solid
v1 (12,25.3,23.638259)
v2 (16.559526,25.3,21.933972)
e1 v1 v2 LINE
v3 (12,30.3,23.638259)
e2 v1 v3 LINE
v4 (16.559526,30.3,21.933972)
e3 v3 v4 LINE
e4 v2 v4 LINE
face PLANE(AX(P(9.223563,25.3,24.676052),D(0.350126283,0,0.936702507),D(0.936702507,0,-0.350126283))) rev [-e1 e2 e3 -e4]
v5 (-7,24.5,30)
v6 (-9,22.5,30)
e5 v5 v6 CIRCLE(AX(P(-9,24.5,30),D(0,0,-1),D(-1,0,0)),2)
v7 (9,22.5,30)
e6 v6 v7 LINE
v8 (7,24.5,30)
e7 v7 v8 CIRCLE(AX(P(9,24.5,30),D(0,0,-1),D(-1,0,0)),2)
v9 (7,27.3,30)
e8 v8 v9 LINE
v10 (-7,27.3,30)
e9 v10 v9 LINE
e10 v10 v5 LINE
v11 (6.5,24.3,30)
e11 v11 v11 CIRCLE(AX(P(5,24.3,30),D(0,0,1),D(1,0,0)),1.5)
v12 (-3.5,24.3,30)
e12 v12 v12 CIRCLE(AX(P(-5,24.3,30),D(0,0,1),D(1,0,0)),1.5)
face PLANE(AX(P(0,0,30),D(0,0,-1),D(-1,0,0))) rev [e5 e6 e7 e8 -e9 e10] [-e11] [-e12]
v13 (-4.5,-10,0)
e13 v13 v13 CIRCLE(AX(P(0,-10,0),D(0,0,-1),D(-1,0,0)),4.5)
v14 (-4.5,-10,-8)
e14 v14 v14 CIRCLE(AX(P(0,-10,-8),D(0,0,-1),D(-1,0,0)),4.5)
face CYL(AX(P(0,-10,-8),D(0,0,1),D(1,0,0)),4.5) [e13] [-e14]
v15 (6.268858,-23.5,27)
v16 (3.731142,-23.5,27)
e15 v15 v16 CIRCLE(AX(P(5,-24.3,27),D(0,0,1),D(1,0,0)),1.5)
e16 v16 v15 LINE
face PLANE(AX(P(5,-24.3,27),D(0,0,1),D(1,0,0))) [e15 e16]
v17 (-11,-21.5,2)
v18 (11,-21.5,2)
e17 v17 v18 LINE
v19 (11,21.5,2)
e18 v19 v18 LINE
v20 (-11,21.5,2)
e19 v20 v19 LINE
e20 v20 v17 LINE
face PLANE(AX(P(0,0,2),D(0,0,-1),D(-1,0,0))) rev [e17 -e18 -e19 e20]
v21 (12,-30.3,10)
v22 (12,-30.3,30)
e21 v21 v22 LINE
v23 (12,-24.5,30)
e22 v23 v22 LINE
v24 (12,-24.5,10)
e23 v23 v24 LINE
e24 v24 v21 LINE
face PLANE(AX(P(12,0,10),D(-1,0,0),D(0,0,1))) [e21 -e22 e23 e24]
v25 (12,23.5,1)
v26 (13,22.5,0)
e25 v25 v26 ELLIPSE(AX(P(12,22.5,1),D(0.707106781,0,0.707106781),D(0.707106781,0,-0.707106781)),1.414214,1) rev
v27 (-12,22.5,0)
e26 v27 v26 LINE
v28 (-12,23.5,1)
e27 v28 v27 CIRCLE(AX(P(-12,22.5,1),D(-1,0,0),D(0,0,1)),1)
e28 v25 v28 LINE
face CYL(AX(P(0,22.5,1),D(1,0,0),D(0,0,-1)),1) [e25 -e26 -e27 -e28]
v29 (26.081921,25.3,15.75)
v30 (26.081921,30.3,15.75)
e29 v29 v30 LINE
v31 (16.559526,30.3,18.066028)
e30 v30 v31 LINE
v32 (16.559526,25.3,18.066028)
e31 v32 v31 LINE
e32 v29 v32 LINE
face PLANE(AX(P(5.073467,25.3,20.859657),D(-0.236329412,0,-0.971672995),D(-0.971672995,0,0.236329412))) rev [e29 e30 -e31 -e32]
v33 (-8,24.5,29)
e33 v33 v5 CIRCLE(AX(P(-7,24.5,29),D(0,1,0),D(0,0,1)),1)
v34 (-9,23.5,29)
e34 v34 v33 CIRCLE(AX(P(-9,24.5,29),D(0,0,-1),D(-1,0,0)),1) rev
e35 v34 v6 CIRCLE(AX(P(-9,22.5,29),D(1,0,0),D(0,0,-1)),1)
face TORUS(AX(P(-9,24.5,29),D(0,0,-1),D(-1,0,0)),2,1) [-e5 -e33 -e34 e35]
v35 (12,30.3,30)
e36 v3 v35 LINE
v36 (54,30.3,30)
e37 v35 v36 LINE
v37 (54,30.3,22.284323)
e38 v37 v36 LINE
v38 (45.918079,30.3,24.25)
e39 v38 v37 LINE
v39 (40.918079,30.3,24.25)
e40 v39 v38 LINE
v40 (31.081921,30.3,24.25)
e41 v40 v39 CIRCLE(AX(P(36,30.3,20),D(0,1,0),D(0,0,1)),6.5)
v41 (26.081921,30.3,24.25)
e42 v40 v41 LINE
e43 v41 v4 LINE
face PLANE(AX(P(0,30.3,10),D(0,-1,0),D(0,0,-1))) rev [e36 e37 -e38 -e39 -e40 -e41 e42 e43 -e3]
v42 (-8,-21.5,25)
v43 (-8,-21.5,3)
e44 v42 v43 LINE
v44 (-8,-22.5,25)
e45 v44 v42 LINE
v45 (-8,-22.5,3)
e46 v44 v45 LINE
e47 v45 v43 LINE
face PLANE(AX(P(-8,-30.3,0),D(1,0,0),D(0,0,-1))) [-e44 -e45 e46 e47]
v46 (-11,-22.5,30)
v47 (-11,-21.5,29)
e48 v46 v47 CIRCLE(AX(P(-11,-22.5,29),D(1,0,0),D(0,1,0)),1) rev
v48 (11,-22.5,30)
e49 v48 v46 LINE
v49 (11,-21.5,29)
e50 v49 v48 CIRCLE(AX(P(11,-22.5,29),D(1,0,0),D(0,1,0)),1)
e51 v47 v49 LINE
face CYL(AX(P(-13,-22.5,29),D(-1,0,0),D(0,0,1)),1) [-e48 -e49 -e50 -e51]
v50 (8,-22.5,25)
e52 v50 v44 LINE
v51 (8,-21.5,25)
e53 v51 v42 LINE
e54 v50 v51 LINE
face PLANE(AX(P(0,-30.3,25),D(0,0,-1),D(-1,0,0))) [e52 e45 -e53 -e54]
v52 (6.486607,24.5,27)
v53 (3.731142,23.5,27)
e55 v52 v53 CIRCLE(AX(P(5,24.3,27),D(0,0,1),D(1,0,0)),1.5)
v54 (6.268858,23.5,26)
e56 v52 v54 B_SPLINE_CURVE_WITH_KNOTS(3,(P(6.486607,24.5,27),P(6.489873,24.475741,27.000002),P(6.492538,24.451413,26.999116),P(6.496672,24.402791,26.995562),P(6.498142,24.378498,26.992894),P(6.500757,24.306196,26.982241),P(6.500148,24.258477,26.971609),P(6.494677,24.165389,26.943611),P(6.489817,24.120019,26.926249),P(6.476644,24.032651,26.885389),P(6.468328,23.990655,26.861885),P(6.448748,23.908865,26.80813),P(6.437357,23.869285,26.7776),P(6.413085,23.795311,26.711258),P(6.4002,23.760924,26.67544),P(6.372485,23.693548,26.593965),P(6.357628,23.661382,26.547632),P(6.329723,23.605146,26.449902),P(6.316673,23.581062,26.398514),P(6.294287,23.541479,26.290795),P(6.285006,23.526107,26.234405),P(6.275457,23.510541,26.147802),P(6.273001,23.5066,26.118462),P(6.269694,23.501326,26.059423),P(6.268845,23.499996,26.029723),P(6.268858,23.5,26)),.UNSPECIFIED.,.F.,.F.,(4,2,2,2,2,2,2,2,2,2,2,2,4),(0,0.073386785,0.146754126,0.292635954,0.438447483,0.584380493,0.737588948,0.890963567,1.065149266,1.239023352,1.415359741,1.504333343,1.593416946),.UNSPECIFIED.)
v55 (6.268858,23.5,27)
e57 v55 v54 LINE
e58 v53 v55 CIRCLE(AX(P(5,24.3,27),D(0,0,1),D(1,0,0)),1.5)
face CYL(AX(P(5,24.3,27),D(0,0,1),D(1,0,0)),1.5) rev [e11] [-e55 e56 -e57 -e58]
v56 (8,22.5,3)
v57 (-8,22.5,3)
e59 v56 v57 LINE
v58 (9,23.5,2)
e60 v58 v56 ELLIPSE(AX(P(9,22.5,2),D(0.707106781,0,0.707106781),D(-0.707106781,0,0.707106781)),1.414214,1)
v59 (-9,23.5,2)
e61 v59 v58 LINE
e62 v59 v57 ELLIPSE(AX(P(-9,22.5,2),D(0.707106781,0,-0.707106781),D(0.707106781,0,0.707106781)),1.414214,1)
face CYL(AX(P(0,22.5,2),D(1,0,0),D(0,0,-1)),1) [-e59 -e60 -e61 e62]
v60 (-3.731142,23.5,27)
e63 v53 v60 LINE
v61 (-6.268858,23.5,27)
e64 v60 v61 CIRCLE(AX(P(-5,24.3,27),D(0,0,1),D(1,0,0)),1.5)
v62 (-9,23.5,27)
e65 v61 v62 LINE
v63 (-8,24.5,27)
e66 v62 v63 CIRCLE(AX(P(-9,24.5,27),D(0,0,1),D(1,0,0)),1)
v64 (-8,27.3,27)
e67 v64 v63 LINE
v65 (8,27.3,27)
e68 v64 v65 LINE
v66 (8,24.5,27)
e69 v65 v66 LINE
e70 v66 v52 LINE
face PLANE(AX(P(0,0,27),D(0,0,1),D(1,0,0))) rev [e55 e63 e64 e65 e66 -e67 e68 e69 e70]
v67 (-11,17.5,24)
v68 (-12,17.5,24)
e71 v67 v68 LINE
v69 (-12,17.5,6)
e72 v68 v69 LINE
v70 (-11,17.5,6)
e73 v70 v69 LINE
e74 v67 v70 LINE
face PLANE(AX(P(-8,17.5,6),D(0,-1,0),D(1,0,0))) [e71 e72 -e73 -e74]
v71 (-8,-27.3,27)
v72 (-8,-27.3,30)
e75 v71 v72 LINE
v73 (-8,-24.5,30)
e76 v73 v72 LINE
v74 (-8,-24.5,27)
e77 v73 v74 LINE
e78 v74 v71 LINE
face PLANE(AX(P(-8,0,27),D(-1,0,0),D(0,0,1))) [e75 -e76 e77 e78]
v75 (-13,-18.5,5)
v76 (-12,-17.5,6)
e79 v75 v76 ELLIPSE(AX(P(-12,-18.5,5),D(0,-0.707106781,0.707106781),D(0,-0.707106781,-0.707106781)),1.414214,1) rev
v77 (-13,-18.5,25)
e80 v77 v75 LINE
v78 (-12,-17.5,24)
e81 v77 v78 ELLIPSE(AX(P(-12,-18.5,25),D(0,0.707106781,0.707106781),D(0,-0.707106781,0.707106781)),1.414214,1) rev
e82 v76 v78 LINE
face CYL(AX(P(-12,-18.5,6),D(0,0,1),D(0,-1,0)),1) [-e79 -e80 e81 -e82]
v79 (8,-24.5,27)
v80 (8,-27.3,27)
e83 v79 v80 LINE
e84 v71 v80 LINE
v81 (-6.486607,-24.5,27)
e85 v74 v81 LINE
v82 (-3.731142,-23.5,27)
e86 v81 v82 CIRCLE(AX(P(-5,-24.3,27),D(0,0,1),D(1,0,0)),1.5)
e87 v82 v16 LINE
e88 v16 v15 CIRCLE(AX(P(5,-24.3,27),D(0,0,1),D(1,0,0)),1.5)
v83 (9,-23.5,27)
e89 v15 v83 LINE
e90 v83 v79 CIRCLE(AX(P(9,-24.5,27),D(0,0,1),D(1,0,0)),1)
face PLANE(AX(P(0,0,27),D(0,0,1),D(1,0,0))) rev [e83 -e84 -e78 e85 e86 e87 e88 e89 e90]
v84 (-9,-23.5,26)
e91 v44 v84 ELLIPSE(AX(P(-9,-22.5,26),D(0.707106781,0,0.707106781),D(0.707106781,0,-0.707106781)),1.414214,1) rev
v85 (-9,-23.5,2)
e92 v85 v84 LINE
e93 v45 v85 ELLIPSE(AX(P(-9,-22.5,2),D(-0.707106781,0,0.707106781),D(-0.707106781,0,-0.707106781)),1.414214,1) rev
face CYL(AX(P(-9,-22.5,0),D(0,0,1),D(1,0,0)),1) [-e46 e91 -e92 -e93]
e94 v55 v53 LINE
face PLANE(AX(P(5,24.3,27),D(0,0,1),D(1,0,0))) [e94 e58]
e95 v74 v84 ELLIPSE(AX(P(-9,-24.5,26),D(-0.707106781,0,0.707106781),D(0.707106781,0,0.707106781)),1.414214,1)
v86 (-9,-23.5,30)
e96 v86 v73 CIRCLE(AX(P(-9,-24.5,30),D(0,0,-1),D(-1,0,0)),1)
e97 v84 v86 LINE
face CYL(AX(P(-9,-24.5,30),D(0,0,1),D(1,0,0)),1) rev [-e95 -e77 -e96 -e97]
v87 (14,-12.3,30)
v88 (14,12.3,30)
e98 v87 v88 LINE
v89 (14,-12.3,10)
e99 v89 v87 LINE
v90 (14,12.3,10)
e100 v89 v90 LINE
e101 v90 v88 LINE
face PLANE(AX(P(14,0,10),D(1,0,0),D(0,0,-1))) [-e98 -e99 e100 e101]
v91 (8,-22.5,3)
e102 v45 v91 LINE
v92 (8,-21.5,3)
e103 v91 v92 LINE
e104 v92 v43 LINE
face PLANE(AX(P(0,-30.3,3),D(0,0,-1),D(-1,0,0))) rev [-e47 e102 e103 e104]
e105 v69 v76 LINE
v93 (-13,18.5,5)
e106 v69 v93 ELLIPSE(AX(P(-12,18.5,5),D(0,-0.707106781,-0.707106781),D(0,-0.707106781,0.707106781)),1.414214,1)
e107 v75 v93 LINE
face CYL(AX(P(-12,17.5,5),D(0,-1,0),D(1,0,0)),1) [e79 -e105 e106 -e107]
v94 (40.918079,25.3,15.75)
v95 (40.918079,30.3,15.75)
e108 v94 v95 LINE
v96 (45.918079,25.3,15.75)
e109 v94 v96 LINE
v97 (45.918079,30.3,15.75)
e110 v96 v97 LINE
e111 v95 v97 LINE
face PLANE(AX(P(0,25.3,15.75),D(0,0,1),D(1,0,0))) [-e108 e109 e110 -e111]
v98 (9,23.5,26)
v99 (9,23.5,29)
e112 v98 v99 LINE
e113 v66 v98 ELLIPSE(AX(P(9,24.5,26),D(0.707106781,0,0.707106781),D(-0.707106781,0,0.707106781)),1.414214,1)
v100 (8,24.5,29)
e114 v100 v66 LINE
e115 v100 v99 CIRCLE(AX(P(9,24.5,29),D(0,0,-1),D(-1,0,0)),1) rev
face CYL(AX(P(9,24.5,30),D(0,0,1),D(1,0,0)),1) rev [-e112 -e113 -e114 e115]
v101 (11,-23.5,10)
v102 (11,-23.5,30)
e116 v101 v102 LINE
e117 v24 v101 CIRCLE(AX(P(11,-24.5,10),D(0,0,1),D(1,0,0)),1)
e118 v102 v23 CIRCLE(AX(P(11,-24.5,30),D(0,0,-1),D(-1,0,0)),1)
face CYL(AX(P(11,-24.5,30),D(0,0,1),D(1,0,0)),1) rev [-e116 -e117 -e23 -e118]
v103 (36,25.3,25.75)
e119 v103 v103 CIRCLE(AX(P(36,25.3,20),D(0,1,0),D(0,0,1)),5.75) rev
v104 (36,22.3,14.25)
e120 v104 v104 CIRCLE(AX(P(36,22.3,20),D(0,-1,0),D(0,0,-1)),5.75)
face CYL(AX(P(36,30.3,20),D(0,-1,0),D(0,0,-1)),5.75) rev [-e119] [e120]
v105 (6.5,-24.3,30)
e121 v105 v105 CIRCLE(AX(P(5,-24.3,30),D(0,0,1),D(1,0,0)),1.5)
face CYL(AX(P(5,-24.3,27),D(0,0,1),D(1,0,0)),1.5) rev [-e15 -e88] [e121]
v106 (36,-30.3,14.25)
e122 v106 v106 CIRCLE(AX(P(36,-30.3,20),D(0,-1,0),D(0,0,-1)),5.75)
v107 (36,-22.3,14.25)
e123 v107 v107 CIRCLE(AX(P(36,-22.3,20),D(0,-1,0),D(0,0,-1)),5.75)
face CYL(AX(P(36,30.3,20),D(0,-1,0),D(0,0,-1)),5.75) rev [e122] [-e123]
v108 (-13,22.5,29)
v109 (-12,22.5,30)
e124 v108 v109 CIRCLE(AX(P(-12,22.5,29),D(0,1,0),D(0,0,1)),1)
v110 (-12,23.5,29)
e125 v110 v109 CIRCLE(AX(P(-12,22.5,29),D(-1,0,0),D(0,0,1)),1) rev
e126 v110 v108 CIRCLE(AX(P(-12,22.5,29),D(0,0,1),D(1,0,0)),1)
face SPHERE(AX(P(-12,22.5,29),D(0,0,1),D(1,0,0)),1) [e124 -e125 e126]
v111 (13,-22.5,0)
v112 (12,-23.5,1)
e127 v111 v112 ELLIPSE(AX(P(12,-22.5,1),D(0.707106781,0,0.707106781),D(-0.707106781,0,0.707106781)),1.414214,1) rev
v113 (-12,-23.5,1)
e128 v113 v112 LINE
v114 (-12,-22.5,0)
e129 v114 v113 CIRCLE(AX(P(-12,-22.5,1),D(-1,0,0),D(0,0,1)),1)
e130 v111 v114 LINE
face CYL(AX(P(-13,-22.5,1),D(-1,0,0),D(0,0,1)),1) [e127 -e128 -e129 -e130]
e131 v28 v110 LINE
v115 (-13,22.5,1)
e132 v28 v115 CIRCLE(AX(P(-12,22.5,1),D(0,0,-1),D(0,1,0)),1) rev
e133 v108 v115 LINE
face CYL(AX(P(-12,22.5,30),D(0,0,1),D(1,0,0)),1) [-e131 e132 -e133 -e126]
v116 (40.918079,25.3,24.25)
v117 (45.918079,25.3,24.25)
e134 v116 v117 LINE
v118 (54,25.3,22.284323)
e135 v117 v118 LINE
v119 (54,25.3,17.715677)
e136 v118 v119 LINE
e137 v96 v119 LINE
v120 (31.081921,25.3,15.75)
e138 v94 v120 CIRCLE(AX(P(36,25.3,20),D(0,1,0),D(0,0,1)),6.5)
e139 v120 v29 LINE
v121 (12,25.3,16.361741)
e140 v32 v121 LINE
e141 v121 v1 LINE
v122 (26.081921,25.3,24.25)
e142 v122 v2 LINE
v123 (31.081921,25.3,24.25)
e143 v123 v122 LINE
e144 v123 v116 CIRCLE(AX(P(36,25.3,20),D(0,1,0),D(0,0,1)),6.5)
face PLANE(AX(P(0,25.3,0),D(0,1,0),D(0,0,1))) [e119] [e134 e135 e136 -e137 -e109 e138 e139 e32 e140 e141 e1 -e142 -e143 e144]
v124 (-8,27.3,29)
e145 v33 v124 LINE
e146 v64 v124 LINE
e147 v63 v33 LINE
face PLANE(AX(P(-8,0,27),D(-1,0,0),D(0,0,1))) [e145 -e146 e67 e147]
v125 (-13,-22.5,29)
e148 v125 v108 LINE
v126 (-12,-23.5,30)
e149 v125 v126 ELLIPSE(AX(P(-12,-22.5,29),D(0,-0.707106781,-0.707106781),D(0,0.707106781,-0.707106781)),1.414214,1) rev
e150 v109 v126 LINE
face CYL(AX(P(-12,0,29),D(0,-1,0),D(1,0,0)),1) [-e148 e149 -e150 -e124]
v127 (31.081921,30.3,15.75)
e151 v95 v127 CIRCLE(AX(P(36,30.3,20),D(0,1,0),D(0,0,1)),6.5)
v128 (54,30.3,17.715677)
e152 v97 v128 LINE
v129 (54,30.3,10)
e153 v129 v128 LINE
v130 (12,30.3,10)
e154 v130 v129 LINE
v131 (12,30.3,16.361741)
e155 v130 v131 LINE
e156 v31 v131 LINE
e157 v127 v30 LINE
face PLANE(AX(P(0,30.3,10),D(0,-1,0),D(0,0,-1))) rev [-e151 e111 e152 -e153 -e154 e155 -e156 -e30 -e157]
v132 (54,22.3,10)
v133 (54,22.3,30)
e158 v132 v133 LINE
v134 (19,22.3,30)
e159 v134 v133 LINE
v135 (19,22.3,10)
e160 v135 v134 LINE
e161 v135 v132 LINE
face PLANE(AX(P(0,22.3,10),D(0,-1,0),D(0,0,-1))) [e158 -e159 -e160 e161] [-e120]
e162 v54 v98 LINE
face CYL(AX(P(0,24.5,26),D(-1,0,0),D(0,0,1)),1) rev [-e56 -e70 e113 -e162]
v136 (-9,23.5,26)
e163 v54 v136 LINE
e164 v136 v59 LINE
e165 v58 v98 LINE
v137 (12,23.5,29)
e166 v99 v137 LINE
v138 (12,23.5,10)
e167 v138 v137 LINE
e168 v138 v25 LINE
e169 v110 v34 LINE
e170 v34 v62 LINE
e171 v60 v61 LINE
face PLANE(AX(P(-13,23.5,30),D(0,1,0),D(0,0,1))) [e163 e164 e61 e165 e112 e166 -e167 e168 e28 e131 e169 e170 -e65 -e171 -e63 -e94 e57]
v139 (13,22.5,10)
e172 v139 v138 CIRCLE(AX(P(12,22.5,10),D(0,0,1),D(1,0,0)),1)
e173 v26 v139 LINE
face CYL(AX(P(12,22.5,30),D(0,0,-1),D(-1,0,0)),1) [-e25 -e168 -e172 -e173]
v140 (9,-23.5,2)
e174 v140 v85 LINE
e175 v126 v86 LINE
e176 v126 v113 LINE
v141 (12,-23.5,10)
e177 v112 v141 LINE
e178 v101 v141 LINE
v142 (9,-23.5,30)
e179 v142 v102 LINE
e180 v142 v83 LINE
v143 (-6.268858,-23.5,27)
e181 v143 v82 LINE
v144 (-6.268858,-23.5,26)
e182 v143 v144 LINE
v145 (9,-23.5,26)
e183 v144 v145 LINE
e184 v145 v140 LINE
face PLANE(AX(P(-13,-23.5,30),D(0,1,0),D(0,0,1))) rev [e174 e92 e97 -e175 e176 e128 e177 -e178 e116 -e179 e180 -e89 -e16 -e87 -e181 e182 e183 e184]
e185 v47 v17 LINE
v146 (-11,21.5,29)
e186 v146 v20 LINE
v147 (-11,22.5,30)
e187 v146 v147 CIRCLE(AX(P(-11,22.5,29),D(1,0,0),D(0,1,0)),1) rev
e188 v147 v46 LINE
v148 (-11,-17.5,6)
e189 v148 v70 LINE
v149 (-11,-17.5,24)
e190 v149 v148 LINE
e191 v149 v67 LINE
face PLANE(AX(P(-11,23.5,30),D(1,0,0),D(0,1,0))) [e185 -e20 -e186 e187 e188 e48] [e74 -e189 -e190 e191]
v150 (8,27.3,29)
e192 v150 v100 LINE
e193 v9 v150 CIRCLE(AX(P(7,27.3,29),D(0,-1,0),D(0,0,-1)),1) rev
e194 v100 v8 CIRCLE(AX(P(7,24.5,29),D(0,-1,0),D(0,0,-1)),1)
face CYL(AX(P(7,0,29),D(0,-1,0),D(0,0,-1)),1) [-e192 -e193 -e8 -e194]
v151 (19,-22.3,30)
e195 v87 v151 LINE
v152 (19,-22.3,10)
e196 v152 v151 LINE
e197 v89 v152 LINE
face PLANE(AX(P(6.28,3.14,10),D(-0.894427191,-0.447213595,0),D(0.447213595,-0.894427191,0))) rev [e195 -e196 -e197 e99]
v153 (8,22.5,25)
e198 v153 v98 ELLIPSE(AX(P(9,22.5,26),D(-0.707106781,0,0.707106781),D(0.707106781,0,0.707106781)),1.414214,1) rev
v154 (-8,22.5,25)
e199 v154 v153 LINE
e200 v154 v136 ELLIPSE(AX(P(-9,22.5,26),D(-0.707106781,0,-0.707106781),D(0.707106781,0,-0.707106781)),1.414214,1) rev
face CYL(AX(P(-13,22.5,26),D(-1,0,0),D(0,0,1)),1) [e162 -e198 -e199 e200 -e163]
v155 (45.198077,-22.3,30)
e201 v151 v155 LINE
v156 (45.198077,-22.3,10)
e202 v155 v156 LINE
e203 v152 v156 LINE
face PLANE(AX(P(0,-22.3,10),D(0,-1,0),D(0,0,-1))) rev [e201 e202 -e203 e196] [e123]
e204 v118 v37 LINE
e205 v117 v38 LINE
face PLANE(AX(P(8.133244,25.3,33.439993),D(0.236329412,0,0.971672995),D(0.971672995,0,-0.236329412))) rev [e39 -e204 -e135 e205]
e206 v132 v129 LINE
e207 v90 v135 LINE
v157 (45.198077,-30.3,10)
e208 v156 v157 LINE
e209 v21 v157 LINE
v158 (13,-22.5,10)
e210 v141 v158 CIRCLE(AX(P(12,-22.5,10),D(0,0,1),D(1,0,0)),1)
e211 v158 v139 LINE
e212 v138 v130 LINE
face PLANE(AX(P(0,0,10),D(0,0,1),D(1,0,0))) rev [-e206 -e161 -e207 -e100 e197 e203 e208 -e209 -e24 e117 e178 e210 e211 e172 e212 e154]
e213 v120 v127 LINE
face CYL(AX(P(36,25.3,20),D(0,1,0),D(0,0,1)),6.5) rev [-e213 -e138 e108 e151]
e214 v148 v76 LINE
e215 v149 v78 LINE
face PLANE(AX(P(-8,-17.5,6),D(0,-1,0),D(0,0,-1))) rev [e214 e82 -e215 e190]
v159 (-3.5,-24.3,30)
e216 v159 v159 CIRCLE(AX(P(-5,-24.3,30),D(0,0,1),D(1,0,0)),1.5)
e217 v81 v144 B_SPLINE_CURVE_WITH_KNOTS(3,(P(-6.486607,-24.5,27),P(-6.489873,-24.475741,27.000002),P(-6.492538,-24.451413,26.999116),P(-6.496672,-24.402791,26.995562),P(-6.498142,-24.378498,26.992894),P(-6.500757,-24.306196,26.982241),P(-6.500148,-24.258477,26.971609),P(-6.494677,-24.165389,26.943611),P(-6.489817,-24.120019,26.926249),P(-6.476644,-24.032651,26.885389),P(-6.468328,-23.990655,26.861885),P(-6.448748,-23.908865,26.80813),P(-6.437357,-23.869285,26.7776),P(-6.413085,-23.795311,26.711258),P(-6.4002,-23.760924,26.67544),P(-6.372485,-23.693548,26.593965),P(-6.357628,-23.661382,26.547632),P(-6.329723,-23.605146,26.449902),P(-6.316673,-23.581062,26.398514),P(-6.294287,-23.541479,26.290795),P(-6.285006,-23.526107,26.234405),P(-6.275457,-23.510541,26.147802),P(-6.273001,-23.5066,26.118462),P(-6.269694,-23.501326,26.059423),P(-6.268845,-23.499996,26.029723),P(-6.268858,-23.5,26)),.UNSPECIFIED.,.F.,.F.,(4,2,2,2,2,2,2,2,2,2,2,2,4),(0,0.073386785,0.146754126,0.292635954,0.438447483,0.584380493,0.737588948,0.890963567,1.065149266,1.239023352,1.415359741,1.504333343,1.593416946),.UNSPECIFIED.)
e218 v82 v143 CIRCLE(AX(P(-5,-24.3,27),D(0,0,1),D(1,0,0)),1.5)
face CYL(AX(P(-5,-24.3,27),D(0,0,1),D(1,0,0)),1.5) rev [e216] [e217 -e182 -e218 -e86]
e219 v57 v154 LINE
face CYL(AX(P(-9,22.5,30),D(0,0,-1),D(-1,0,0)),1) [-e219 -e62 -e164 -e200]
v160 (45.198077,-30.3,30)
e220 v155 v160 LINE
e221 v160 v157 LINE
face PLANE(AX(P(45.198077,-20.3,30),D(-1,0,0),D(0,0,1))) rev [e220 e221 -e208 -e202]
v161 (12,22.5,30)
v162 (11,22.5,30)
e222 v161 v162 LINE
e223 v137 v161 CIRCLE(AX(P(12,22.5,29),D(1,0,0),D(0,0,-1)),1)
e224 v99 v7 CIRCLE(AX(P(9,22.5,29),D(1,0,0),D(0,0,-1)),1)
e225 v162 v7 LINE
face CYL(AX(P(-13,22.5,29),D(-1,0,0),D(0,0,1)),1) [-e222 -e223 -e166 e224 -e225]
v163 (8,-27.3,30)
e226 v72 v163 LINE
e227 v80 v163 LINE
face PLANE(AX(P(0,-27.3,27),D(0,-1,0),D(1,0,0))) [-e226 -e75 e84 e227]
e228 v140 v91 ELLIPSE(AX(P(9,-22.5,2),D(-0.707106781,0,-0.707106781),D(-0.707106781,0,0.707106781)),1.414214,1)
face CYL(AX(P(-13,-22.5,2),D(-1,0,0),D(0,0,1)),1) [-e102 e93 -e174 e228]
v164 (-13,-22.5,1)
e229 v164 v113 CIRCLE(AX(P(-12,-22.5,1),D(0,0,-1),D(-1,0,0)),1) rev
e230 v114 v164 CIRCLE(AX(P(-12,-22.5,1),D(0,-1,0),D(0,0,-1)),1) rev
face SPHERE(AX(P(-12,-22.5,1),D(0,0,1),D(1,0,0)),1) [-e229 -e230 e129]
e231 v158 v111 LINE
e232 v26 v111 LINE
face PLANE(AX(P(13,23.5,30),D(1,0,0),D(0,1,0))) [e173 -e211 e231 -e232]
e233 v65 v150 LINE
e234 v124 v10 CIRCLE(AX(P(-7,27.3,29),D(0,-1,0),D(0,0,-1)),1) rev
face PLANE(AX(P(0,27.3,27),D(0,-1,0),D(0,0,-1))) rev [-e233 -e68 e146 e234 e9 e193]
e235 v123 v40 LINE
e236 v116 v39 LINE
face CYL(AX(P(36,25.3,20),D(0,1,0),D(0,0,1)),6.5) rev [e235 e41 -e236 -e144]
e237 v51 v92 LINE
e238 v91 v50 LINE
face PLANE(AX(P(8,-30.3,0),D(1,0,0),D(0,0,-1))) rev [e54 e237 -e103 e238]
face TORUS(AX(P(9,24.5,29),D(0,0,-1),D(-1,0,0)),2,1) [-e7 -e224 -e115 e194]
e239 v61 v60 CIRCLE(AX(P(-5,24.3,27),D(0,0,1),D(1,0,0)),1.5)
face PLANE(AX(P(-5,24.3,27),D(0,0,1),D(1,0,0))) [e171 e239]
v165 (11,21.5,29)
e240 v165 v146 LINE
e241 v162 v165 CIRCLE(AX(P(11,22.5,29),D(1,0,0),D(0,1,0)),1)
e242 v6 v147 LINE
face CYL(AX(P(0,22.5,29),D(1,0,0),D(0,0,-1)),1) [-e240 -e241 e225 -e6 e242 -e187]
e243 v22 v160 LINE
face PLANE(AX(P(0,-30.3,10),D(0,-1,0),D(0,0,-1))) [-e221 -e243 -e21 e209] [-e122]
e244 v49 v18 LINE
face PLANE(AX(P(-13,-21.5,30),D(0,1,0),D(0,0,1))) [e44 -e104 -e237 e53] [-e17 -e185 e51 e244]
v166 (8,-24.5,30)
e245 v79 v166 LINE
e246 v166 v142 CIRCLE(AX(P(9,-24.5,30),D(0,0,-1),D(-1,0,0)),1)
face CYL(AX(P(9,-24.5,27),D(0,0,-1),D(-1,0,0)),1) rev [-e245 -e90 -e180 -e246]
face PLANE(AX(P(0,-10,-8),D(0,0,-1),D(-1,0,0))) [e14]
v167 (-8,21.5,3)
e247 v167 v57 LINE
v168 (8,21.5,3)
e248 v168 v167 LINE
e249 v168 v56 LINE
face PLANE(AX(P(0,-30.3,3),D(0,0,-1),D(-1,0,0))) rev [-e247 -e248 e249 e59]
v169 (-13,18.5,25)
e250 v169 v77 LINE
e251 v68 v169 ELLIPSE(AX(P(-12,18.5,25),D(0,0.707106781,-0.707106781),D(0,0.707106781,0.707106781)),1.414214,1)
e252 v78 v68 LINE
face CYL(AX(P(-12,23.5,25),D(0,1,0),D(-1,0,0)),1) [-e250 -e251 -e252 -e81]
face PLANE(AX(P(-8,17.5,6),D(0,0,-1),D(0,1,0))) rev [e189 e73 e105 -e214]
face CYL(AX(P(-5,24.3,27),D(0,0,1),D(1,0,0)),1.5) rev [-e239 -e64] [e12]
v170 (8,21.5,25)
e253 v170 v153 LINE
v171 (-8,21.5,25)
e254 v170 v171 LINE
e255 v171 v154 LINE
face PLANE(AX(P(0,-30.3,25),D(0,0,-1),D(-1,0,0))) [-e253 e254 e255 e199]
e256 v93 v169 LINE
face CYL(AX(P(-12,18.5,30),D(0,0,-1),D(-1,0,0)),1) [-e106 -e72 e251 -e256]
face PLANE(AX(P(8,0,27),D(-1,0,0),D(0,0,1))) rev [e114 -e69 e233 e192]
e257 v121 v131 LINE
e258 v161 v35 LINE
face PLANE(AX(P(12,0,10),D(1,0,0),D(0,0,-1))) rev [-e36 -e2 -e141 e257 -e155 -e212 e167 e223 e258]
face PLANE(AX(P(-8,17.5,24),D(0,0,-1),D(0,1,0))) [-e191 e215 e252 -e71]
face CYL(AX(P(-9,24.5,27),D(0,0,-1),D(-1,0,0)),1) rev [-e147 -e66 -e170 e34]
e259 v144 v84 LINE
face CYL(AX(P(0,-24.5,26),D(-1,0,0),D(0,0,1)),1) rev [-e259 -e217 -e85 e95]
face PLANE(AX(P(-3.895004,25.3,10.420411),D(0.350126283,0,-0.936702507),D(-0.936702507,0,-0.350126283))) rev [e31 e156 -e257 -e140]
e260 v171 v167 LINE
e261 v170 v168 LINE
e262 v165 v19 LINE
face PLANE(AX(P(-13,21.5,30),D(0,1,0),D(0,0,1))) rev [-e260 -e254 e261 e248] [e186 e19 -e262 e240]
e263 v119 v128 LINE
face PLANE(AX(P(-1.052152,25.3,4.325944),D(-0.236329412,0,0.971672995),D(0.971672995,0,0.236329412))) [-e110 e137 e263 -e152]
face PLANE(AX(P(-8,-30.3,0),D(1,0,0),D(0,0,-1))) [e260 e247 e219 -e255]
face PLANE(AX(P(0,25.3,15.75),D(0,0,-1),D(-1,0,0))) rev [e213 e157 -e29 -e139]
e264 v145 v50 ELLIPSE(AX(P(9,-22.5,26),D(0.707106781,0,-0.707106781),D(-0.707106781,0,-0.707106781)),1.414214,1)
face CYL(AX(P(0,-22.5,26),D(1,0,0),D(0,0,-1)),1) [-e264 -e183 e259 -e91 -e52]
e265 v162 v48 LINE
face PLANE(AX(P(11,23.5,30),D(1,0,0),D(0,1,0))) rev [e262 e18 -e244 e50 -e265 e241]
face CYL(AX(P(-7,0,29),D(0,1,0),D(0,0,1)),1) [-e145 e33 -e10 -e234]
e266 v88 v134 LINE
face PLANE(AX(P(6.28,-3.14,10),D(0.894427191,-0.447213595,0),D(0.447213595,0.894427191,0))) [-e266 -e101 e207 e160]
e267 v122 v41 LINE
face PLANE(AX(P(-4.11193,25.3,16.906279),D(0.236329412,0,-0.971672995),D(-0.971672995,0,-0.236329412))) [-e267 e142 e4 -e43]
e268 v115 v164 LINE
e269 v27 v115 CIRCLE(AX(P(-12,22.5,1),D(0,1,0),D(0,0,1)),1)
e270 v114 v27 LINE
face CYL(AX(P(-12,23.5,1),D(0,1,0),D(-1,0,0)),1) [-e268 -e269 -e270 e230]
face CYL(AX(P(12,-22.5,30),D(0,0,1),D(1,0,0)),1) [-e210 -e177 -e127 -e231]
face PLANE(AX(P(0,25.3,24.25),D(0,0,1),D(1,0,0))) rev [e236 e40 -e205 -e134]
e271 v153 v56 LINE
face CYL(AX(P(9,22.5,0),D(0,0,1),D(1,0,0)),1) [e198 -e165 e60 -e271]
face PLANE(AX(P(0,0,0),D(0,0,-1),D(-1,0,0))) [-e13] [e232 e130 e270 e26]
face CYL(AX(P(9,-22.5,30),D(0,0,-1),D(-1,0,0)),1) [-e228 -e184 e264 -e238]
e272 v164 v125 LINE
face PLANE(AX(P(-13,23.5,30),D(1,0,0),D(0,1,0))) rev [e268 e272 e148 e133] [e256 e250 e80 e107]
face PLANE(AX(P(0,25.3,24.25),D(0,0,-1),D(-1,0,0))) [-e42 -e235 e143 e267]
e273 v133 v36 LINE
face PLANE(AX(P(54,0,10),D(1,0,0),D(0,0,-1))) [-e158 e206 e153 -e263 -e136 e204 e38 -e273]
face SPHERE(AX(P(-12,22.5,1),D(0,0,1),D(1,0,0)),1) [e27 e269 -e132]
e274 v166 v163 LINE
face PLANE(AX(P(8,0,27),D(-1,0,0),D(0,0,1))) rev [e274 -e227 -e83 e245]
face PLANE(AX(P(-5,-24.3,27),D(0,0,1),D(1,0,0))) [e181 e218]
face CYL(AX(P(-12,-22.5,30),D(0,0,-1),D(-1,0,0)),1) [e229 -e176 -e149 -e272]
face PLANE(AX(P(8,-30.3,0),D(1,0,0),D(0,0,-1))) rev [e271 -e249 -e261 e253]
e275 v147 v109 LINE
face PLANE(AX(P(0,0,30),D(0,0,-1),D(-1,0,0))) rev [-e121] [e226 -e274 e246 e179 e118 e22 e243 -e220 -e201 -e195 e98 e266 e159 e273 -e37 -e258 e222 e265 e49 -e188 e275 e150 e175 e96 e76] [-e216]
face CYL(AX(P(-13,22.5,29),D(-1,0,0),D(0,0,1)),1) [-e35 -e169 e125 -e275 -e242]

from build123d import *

# Parameters (mm, degrees)
SKETCH1_W               = 26
SKETCH1_H               = 47
BOSS_EXTRUDE1_DEPTH     = 30
SHELL1_T                = -2
SKETCH2_W               = 10
SKETCH2_H               = 0.8
BOSS_EXTRUDE2_DEPTH     = 3
SKETCH3_R               = 1.5
CUT_EXTRUDE1_DEPTH      = 3
BOSS_EXTRUDE3_DEPTH     = 20
CUT_EXTRUDE2_DEPTH      = 82.134209801
CUT_EXTRUDE2_DEPTH_BACK = 82.134209801
SKETCH6_R               = 4.5
BOSS_EXTRUDE4_DEPTH     = 8
CUT_EXTRUDE3_DEPTH      = 82.917275345
CUT_EXTRUDE3_DEPTH_BACK = 82.917275345
SKETCH9_R               = 5.75
CUT_EXTRUDE4_DEPTH      = 5
SKETCH10_W              = 18
SKETCH10_H              = 35
CUT_EXTRUDE5_DEPTH      = 5
FILLET1_R               = 1
FILLET2_R               = 1
FILLET3_R               = 1
FILLET5_R               = 1
FILLET6_R               = 1
SKETCH11_W              = 8.801922924
SKETCH11_H              = 20
CUT_EXTRUDE6_DEPTH      = 10


# Some blends are built 0.0001 mm under size
with BuildPart() as part:
    # Sketch1 → Boss-Extrude1 (new body)
    with BuildSketch(Plane.XY):
        Rectangle(SKETCH1_W, SKETCH1_H)
    extrude(amount=BOSS_EXTRUDE1_DEPTH)

    # Shell1
    shell1_openings = [part.faces().sort_by_distance(p)[0] for p in [
        (0, 0, 30),
    ]]
    offset(amount=SHELL1_T, openings=shell1_openings, kind=Kind.INTERSECTION)

    # Sketch2 → Boss-Extrude2 (add)
    with BuildSketch(Plane.XY.offset(30)):
        Polygon((-5, 23.5), (-5, 24.3), (5, 24.3), (5, 23.5), (8, 23.5), (8, 27.3), (-8, 27.3), (-8, 23.5), align=None)
        with Locations((0, 23.9)):
            Rectangle(SKETCH2_W, SKETCH2_H)
        Polygon((-5, -24.3), (-5, -23.5), (-8, -23.5), (-8, -27.3), (8, -27.3), (8, -23.5), (5, -23.5), (5, -24.3), align=None)
        with Locations((0, -23.9)):
            Rectangle(SKETCH2_W, SKETCH2_H)
    extrude(amount=-BOSS_EXTRUDE2_DEPTH)

    # Sketch3 → Cut-Extrude1 (cut)
    with BuildSketch(Plane.XY.offset(30)):
        with Locations((-5, -24.3)):
            Circle(SKETCH3_R)
        with Locations((5, -24.3)):
            Circle(SKETCH3_R)
        with Locations((5, 24.3)):
            Circle(SKETCH3_R)
        with Locations((-5, 24.3)):
            Circle(SKETCH3_R)
    extrude(amount=-CUT_EXTRUDE1_DEPTH, mode=Mode.SUBTRACT)

    # Sketch4 → Boss-Extrude3 (add)
    with BuildSketch(Plane.XY.offset(30)):
        Polygon((13, 23.5), (13, -23.5), (12, -23.5), (12, -30.3), (54, -30.3), (54, -22.3), (19, -22.3), (14, -12.3), (14, 12.3), (19, 22.3), (54, 22.3), (54, 30.3), (12, 30.3), (12, 23.5), align=None)
    extrude(amount=-BOSS_EXTRUDE3_DEPTH)

    # Sketch5 → Cut-Extrude2 (cut, two sides: drawn at the far end of the back side and taken through both)
    with BuildSketch(Plane(origin=(0, 22.3, 0), x_dir=(-1, 0, 0), z_dir=(0, -1, 0)).offset(-CUT_EXTRUDE2_DEPTH_BACK)):
        with BuildLine():
            ThreePointArc((-36, -14.25), (-41.75, -20), (-36, -25.75))
            Line((-36, -25.75), (-36, -14.25))
        make_face()
        with BuildLine():
            Line((-36, -14.25), (-36, -25.75))
            ThreePointArc((-36, -25.75), (-31.934136008, -24.065863992), (-30.25, -20))
            ThreePointArc((-30.25, -20), (-31.934136008, -15.934136008), (-36, -14.25))
        make_face()
    extrude(amount=CUT_EXTRUDE2_DEPTH + CUT_EXTRUDE2_DEPTH_BACK, mode=Mode.SUBTRACT)

    # Sketch6 → Boss-Extrude4 (add)
    with BuildSketch(Plane(origin=(0, 0, 0), x_dir=(-1, 0, 0), z_dir=(0, 0, -1))):
        with Locations((0, -10)):
            Circle(SKETCH6_R)
    extrude(amount=BOSS_EXTRUDE4_DEPTH)

    # Sketch7 → Cut-Extrude3 (cut, two sides: drawn at the far end of the back side and taken through both)
    with BuildSketch(Plane(origin=(0, 23.5, 0), x_dir=(1, 0, 0), z_dir=(0, 1, 0)).offset(-CUT_EXTRUDE3_DEPTH_BACK)):
        Polygon((-8, -25), (8, -25), (8, -23), (8, -5), (8, -3), (-8, -3), (-8, -5), (-8, -23), align=None)
    extrude(amount=CUT_EXTRUDE3_DEPTH + CUT_EXTRUDE3_DEPTH_BACK, mode=Mode.SUBTRACT)

    # Sketch9 → Cut-Extrude4 (cut)
    with BuildSketch(Plane(origin=(0, 30.3, 0), x_dir=(1, 0, 0), z_dir=(0, 1, 0))):
        with BuildLine():
            Line((31.081921107, -15.75), (26.081921107, -15.75))
            Line((26.081921107, -15.75), (16.559525756, -18.066028235))
            Line((16.559525756, -18.066028235), (12, -16.361741342))
            Line((12, -16.361741342), (12, -23.638258658))
            Line((12, -23.638258658), (16.559525756, -21.933971765))
            Line((16.559525756, -21.933971765), (26.081921107, -24.25))
            Line((26.081921107, -24.25), (31.081921107, -24.25))
            ThreePointArc((31.081921107, -24.25), (36, -26.5), (40.918078893, -24.25))
            Line((40.918078893, -24.25), (45.918078893, -24.25))
            Line((45.918078893, -24.25), (54, -22.284322585))
            Line((54, -22.284322585), (54, -17.715677415))
            Line((54, -17.715677415), (45.918078893, -15.75))
            Line((45.918078893, -15.75), (40.918078893, -15.75))
            ThreePointArc((40.918078893, -15.75), (36, -13.5), (31.081921107, -15.75))
        make_face()
        with Locations(Location((36, -20, 0), (0, 0, 90))):
            Circle(SKETCH9_R, mode=Mode.SUBTRACT)
    extrude(amount=-CUT_EXTRUDE4_DEPTH, mode=Mode.SUBTRACT)

    # Sketch10 → Cut-Extrude5 (cut)
    with BuildSketch(Plane.ZY.offset(13)):
        with Locations((15, 0)):
            Rectangle(SKETCH10_W, SKETCH10_H)
    extrude(amount=-CUT_EXTRUDE5_DEPTH, mode=Mode.SUBTRACT)

    # Fillet1
    fillet1_edges = [part.edges().sort_by_distance(p)[0] for p in [
        (0, -21.5, 30),
        (-13, 17.5, 15),
        (-13, 0, 24),
        (-13, 0, 6),
        (-13, -17.5, 15),
    ]]
    fillet(fillet1_edges, radius=FILLET1_R)

    # Fillet2
    # the kernel refuses this fillet: 1 mm, written as the material it adds along each edge
    with BuildSketch(Plane(origin=(8, 23.5, 30), x_dir=(1, 0, 0), z_dir=(0, 0, -1))) as fillet2_piece_1:
        with BuildLine():
            CenterArc((FILLET2_R, -FILLET2_R), FILLET2_R, 90, 90)
            Line((0, -FILLET2_R), (-FILLET2_R * 0.02, -FILLET2_R))
            Line((-FILLET2_R * 0.02, -FILLET2_R), (-FILLET2_R * 0.02, FILLET2_R * 0.02))
            Line((-FILLET2_R * 0.02, FILLET2_R * 0.02), (FILLET2_R, FILLET2_R * 0.02))
            Line((FILLET2_R, FILLET2_R * 0.02), (FILLET2_R, 0))
        make_face()
    extrude(amount=3)
    with BuildSketch(Plane(origin=(-8, 23.5, 30), x_dir=(-1, 0, 0), z_dir=(0, 0, -1))) as fillet2_piece_2:
        with BuildLine():
            CenterArc((FILLET2_R, FILLET2_R), FILLET2_R, 180, 90)
            Line((0, FILLET2_R), (-FILLET2_R * 0.02, FILLET2_R))
            Line((-FILLET2_R * 0.02, FILLET2_R), (-FILLET2_R * 0.02, -FILLET2_R * 0.02))
            Line((-FILLET2_R * 0.02, -FILLET2_R * 0.02), (FILLET2_R, -FILLET2_R * 0.02))
            Line((FILLET2_R, -FILLET2_R * 0.02), (FILLET2_R, 0))
        make_face()
    extrude(amount=3)
    with BuildSketch(Plane(origin=(3.768857754, 23.5, 27), x_dir=(0, 0, -1), z_dir=(1, 0, 0))) as fillet2_piece_3_section:
        with BuildLine():
            CenterArc((FILLET2_R, FILLET2_R), FILLET2_R, 180, 90)
            Line((0, FILLET2_R), (-FILLET2_R * 0.02, FILLET2_R))
            Line((-FILLET2_R * 0.02, FILLET2_R), (-FILLET2_R * 0.02, -FILLET2_R * 0.02))
            Line((-FILLET2_R * 0.02, -FILLET2_R * 0.02), (FILLET2_R, -FILLET2_R * 0.02))
            Line((FILLET2_R, -FILLET2_R * 0.02), (FILLET2_R, 0))
        make_face()
    fillet2_piece_3 = extrude(amount=4.231142246, mode=Mode.PRIVATE)
    fillet2_piece_3 = split(fillet2_piece_3, bisect_by=Plane(origin=(7.179036581, 23.695460756, 27), z_dir=(0, 0, -1)), keep=Keep.TOP, mode=Mode.PRIVATE)
    fillet2_piece_3 = fillet2_piece_3 - Plane(origin=(5, 24.3, 26.747269996), x_dir=(1, 0, 0), z_dir=(0, 0, 1)) * Cylinder(1.5, 13, mode=Mode.PRIVATE)
    add(fillet2_piece_3)
    with BuildSketch(Plane(origin=(12, -23.5, 30), x_dir=(0, -1, 0), z_dir=(0, 0, -1))) as fillet2_piece_4:
        with BuildLine():
            CenterArc((FILLET2_R, FILLET2_R), FILLET2_R, 180, 90)
            Line((0, FILLET2_R), (-FILLET2_R * 0.02, FILLET2_R))
            Line((-FILLET2_R * 0.02, FILLET2_R), (-FILLET2_R * 0.02, -FILLET2_R * 0.02))
            Line((-FILLET2_R * 0.02, -FILLET2_R * 0.02), (FILLET2_R, -FILLET2_R * 0.02))
            Line((FILLET2_R, -FILLET2_R * 0.02), (FILLET2_R, 0))
        make_face()
    extrude(amount=20)
    with BuildSketch(Plane(origin=(8, 23.5, 30), x_dir=(1, 0, 0), z_dir=(0, 0, -1))) as fillet2_piece_5a_section:
        with BuildLine():
            CenterArc((FILLET2_R, -FILLET2_R), FILLET2_R, 90, 90)
            Line((0, -FILLET2_R), (-FILLET2_R * 0.02, -FILLET2_R))
            Line((-FILLET2_R * 0.02, -FILLET2_R), (-FILLET2_R * 0.02, FILLET2_R * 0.02))
            Line((-FILLET2_R * 0.02, FILLET2_R * 0.02), (FILLET2_R, FILLET2_R * 0.02))
            Line((FILLET2_R, FILLET2_R * 0.02), (FILLET2_R, 0))
        make_face()
    fillet2_piece_5a = extrude(amount=5.5, mode=Mode.PRIVATE)
    fillet2_piece_5a = split(fillet2_piece_5a, bisect_by=Plane(origin=(8.226395114, 23.726395114, 27), z_dir=(0, 0, -1)), keep=Keep.TOP, mode=Mode.PRIVATE)
    with BuildSketch(Plane(origin=(3.768857754, 23.5, 27), x_dir=(0, 0, -1), z_dir=(1, 0, 0))) as fillet2_piece_5b_section:
        with BuildLine():
            CenterArc((FILLET2_R, FILLET2_R), FILLET2_R, 180, 90)
            Line((0, FILLET2_R), (-FILLET2_R * 0.02, FILLET2_R))
            Line((-FILLET2_R * 0.02, FILLET2_R), (-FILLET2_R * 0.02, -FILLET2_R * 0.02))
            Line((-FILLET2_R * 0.02, -FILLET2_R * 0.02), (FILLET2_R, -FILLET2_R * 0.02))
            Line((FILLET2_R, -FILLET2_R * 0.02), (FILLET2_R, 0))
        make_face()
    fillet2_piece_5b = extrude(amount=6.731142246, mode=Mode.PRIVATE)
    fillet2_piece_5b = split(fillet2_piece_5b, bisect_by=Plane(origin=(9.25, 23.70347313, 27), z_dir=(0, 0, -1)), keep=Keep.TOP, mode=Mode.PRIVATE)
    fillet2_piece_5b = split(fillet2_piece_5b, bisect_by=Plane(origin=(8, 23.70347313, 26.75304895), z_dir=(1, 0, 0)), keep=Keep.TOP, mode=Mode.PRIVATE)
    fillet2_piece_5 = fillet2_piece_5a & fillet2_piece_5b
    add(fillet2_piece_5)

    # Fillet3
    # the kernel refuses this fillet: 1 mm, written as the material it adds along each edge
    with BuildSketch(Plane(origin=(-8, -23.5, 30), x_dir=(-1, 0, 0), z_dir=(0, 0, -1))) as fillet3_piece_1:
        with BuildLine():
            CenterArc((FILLET3_R, -FILLET3_R), FILLET3_R, 90, 90)
            Line((0, -FILLET3_R), (-FILLET3_R * 0.02, -FILLET3_R))
            Line((-FILLET3_R * 0.02, -FILLET3_R), (-FILLET3_R * 0.02, FILLET3_R * 0.02))
            Line((-FILLET3_R * 0.02, FILLET3_R * 0.02), (FILLET3_R, FILLET3_R * 0.02))
            Line((FILLET3_R, FILLET3_R * 0.02), (FILLET3_R, 0))
        make_face()
    extrude(amount=3)
    with BuildSketch(Plane(origin=(8, -23.5, 30), x_dir=(1, 0, 0), z_dir=(0, 0, -1))) as fillet3_piece_2:
        with BuildLine():
            CenterArc((FILLET3_R, FILLET3_R), FILLET3_R, 180, 90)
            Line((0, FILLET3_R), (-FILLET3_R * 0.02, FILLET3_R))
            Line((-FILLET3_R * 0.02, FILLET3_R), (-FILLET3_R * 0.02, -FILLET3_R * 0.02))
            Line((-FILLET3_R * 0.02, -FILLET3_R * 0.02), (FILLET3_R, -FILLET3_R * 0.02))
            Line((FILLET3_R, -FILLET3_R * 0.02), (FILLET3_R, 0))
        make_face()
    extrude(amount=3)
    with BuildSketch(Plane(origin=(-3.768857754, -23.5, 27), x_dir=(0, 0, -1), z_dir=(-1, 0, 0))) as fillet3_piece_3_section:
        with BuildLine():
            CenterArc((FILLET3_R, FILLET3_R), FILLET3_R, 180, 90)
            Line((0, FILLET3_R), (-FILLET3_R * 0.02, FILLET3_R))
            Line((-FILLET3_R * 0.02, FILLET3_R), (-FILLET3_R * 0.02, -FILLET3_R * 0.02))
            Line((-FILLET3_R * 0.02, -FILLET3_R * 0.02), (FILLET3_R, -FILLET3_R * 0.02))
            Line((FILLET3_R, -FILLET3_R * 0.02), (FILLET3_R, 0))
        make_face()
    fillet3_piece_3 = extrude(amount=4.231142246, mode=Mode.PRIVATE)
    fillet3_piece_3 = split(fillet3_piece_3, bisect_by=Plane(origin=(-7.179037039, -23.695460726, 27), z_dir=(0, 0, -1)), keep=Keep.TOP, mode=Mode.PRIVATE)
    fillet3_piece_3 = fillet3_piece_3 - Plane(origin=(-5, -24.3, 26.747269962), x_dir=(1, 0, 0), z_dir=(0, 0, 1)) * Cylinder(1.5, 13, mode=Mode.PRIVATE)
    add(fillet3_piece_3)
    with BuildSketch(Plane(origin=(-3.768857754, -23.5, 27), x_dir=(0, 0, -1), z_dir=(-1, 0, 0))) as fillet3_piece_4a_section:
        with BuildLine():
            CenterArc((FILLET3_R, FILLET3_R), FILLET3_R, 180, 90)
            Line((0, FILLET3_R), (-FILLET3_R * 0.02, FILLET3_R))
            Line((-FILLET3_R * 0.02, FILLET3_R), (-FILLET3_R * 0.02, -FILLET3_R * 0.02))
            Line((-FILLET3_R * 0.02, -FILLET3_R * 0.02), (FILLET3_R, -FILLET3_R * 0.02))
            Line((FILLET3_R, -FILLET3_R * 0.02), (FILLET3_R, 0))
        make_face()
    fillet3_piece_4a = extrude(amount=6.731142246, mode=Mode.PRIVATE)
    fillet3_piece_4a = split(fillet3_piece_4a, bisect_by=Plane(origin=(-9.25, -23.70347313, 27), z_dir=(0, 0, -1)), keep=Keep.TOP, mode=Mode.PRIVATE)
    fillet3_piece_4a = split(fillet3_piece_4a, bisect_by=Plane(origin=(-8, -23.70347313, 26.75304895), z_dir=(-1, 0, 0)), keep=Keep.TOP, mode=Mode.PRIVATE)
    with BuildSketch(Plane(origin=(-8, -23.5, 30), x_dir=(-1, 0, 0), z_dir=(0, 0, -1))) as fillet3_piece_4b_section:
        with BuildLine():
            CenterArc((FILLET3_R, -FILLET3_R), FILLET3_R, 90, 90)
            Line((0, -FILLET3_R), (-FILLET3_R * 0.02, -FILLET3_R))
            Line((-FILLET3_R * 0.02, -FILLET3_R), (-FILLET3_R * 0.02, FILLET3_R * 0.02))
            Line((-FILLET3_R * 0.02, FILLET3_R * 0.02), (FILLET3_R, FILLET3_R * 0.02))
            Line((FILLET3_R, FILLET3_R * 0.02), (FILLET3_R, 0))
        make_face()
    fillet3_piece_4b = extrude(amount=5.5, mode=Mode.PRIVATE)
    fillet3_piece_4b = split(fillet3_piece_4b, bisect_by=Plane(origin=(-8.226395114, -23.726395114, 27), z_dir=(0, 0, -1)), keep=Keep.TOP, mode=Mode.PRIVATE)
    fillet3_piece_4 = fillet3_piece_4a & fillet3_piece_4b
    add(fillet3_piece_4)

    # Fillet5
    fillet5_edges = [part.edges().sort_by_distance(p)[0] for p in [
        (-11, 23.5, 30),
        (-8, 23.5, 14),
        (0, 23.5, 3),
        (0, -23.5, 3),
        (8, 23.5, 14),
        (8, -23.5, 14),
        (0, 23.5, 25),
        (-8, -23.5, 14),
        (0, -23.5, 25),
        (-13, 0, 30),
        (8, 25.9, 30),
        (10.5, 23.5, 30),
        (-8, 25.9, 30),
        (-8.292893219, 23.792893219, 30),
        (8.292893219, 23.792893219, 30),
        (-13, 0, 0),
        (0, 23.5, 0),
        (0, -23.5, 0),
        (-13, -23.5, 15),
        (-13, 23.5, 15),
        (13, 23.5, 5),
        (13, -23.5, 5),
    ]]
    fillet(fillet5_edges, radius=FILLET5_R - 0.0001)  # a hair under: the kernel refuses the full size

    # Fillet6
    fillet6_edges = [part.edges().sort_by_distance(p)[0] for p in [
        (0, 21.5, 30),
    ]]
    fillet(fillet6_edges, radius=FILLET6_R)

    # Sketch11 → Cut-Extrude6 (cut)
    with BuildSketch(Plane.XZ.offset(30.3)):
        with Locations((49.599038538, 20)):
            Rectangle(SKETCH11_W, SKETCH11_H)
    extrude(amount=-CUT_EXTRUDE6_DEPTH, mode=Mode.SUBTRACT)


solid = part.part
